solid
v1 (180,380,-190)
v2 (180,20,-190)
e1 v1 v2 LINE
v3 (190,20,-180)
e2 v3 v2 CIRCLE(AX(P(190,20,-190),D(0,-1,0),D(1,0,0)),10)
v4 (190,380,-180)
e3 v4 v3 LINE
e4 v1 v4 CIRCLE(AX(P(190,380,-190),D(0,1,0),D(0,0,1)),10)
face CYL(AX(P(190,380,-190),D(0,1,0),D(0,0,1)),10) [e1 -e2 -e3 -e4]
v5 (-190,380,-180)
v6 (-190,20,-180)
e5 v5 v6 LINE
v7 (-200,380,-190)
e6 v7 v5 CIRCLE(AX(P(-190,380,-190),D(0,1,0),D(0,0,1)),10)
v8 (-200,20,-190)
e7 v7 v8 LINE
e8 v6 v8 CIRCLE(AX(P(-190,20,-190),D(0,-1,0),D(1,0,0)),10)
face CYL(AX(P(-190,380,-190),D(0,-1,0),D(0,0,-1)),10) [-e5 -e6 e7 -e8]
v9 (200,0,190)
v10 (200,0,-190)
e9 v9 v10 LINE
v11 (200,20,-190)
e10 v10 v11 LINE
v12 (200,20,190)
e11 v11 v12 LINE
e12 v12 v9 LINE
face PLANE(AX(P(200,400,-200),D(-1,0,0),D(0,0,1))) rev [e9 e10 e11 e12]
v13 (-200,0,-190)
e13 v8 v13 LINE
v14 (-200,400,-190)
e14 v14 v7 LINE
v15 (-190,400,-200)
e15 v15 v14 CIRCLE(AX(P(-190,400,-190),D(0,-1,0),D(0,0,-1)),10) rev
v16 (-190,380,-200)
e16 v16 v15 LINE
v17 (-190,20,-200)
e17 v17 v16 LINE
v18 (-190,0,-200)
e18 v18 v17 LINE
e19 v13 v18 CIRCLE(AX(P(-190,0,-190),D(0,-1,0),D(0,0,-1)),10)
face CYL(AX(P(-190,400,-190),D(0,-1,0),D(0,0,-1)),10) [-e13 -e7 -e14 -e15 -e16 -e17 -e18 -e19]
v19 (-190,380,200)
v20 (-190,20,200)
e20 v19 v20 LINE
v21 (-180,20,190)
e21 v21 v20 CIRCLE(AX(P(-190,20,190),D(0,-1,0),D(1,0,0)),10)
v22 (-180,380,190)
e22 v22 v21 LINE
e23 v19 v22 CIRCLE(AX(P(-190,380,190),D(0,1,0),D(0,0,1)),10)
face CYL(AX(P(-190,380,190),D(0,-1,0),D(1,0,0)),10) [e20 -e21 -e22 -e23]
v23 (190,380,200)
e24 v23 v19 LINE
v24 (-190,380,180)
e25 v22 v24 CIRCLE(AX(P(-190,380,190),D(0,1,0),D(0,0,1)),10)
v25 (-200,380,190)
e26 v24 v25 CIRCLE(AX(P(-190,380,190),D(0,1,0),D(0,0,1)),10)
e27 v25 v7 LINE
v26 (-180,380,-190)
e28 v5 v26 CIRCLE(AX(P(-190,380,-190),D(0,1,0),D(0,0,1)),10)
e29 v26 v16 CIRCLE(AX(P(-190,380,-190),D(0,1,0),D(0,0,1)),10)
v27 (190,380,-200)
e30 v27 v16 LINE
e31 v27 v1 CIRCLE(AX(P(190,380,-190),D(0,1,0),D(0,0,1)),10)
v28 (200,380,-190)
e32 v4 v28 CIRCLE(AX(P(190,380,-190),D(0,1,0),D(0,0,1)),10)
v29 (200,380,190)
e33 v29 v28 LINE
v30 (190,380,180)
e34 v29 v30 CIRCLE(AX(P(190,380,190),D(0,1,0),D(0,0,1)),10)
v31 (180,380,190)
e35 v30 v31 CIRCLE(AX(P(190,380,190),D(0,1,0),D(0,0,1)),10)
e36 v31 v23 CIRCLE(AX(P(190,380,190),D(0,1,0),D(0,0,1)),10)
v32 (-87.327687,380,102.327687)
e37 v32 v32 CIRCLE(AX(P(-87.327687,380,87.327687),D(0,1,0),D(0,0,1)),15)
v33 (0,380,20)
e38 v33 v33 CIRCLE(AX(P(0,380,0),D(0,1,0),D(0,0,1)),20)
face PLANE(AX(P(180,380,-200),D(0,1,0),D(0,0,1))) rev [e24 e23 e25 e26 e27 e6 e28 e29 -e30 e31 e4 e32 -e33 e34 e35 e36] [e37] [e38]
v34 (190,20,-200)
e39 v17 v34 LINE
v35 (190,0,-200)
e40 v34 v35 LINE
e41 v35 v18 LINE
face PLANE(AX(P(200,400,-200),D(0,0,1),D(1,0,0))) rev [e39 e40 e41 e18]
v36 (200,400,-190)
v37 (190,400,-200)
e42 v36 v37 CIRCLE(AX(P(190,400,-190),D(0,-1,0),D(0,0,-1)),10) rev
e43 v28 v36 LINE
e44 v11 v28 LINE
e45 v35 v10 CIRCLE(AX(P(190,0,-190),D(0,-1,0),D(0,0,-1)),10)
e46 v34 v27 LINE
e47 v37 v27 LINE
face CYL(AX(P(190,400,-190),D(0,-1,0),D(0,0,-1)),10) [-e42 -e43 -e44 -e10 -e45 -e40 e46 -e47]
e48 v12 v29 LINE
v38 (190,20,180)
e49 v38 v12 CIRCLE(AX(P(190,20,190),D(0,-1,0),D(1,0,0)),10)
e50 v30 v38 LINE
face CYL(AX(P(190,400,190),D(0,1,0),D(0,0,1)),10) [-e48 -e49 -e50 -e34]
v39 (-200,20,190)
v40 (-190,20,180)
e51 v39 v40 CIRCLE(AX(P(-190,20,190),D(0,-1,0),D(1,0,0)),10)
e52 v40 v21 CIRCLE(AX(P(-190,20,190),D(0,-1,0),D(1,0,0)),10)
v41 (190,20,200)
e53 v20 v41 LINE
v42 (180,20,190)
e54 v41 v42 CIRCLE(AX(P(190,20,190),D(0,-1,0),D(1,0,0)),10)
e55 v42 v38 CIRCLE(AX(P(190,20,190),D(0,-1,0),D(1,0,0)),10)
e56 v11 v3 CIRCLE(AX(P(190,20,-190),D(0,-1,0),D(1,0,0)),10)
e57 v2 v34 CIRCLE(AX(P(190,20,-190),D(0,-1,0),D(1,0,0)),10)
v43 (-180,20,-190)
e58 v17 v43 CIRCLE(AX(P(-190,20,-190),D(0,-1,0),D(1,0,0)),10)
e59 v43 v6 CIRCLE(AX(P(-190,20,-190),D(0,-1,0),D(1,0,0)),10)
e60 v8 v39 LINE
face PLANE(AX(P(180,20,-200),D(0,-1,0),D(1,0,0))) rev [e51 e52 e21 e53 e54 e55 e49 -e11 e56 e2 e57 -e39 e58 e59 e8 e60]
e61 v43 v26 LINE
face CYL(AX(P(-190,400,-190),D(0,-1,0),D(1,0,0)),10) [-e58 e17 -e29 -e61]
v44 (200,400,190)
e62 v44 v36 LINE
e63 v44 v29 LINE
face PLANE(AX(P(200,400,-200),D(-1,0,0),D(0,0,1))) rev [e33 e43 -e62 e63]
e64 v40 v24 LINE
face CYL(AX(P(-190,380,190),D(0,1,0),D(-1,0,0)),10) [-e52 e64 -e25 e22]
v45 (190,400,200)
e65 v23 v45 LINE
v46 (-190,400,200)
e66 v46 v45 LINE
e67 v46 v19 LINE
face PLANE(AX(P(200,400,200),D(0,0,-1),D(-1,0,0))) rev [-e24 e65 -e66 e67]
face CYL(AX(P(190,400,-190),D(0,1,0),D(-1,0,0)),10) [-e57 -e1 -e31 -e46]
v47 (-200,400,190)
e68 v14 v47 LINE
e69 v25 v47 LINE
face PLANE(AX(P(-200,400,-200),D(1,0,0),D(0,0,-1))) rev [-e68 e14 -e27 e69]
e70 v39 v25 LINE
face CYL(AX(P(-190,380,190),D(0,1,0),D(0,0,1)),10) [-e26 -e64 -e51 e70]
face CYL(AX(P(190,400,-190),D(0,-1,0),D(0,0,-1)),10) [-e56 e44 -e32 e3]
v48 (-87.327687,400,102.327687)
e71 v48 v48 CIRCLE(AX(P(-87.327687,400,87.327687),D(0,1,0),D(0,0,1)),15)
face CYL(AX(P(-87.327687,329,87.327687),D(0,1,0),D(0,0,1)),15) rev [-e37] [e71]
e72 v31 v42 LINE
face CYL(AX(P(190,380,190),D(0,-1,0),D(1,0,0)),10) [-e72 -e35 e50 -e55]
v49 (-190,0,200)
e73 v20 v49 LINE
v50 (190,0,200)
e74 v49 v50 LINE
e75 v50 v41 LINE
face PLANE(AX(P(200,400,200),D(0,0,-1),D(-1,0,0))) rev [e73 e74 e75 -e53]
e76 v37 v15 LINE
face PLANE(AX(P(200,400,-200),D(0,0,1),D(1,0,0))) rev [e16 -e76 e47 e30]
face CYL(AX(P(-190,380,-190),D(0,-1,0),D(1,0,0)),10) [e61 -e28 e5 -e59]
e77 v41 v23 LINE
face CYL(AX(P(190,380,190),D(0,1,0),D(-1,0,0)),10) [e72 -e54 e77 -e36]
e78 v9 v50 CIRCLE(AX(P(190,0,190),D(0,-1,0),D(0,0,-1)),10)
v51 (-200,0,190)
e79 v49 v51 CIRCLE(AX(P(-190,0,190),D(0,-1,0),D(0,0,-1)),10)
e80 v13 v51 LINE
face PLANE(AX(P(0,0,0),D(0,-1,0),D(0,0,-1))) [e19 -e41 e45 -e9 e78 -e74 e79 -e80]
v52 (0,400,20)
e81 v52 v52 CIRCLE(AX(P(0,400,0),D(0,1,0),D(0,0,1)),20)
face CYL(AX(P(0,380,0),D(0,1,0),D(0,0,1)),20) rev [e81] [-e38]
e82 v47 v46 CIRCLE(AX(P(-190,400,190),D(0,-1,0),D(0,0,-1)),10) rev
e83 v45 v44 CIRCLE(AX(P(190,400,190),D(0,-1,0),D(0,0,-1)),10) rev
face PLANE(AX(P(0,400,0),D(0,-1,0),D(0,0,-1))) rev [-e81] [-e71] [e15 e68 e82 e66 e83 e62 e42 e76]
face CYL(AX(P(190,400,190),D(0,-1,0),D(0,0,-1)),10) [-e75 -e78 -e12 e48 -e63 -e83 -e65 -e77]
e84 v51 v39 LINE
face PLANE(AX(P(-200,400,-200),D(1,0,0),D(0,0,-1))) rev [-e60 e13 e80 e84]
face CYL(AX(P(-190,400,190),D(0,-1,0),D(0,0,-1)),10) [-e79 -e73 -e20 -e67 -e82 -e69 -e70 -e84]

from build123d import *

# Parameters (mm, degrees)
SKETCH2_W           = 400
SKETCH2_H           = 400
BOSS_EXTRUDE1_DEPTH = 400
SKETCH3_W           = 360
SKETCH3_H           = 360
CUT_EXTRUDE4_DEPTH  = 400
SKETCH5_W           = 360
SKETCH5_H           = 360
CUT_EXTRUDE5_DEPTH  = 400
FILLET1_R           = 10
FILLET2_START       = -1
FILLET2_DEPTH       = 402
FILLET3_R           = 10
FILLET4_R           = 10
FILLET6_R           = 10
FILLET7_R           = 10
FILLET8_R           = 10
SKETCH6_R           = 20
CUT_EXTRUDE6_DEPTH  = 20
SKETCH9_R           = 15
CUT_EXTRUDE8_DEPTH  = 71


with BuildPart() as part:
    # Sketch2 → Boss-Extrude1 (new body)
    with BuildSketch(Plane(origin=(0, 0, 0), x_dir=(1, 0, 0), z_dir=(0, 1, 0))):
        Rectangle(SKETCH2_W, SKETCH2_H)
    extrude(amount=BOSS_EXTRUDE1_DEPTH)

    # Sketch3 → Cut-Extrude4 (cut)
    with BuildSketch(Plane.XY.offset(200)):
        with Locations((0, 200)):
            Rectangle(SKETCH3_W, SKETCH3_H)
    extrude(amount=-CUT_EXTRUDE4_DEPTH, mode=Mode.SUBTRACT)

    # Sketch5 → Cut-Extrude5 (cut)
    with BuildSketch(Plane.ZY.offset(200)):
        with Locations((0, 200)):
            Rectangle(SKETCH5_W, SKETCH5_H)
    extrude(amount=-CUT_EXTRUDE5_DEPTH, mode=Mode.SUBTRACT)

    # Fillet1
    fillet1_edges = [part.edges().sort_by_distance(p)[0] for p in [
        (200, 200, 180),
    ]]
    fillet(fillet1_edges, radius=FILLET1_R)

    # Fillet2: read off the stored shape, not the designer's step
    # Fillet2 outline → Fillet2 (cut)
    with BuildSketch(Plane(origin=(0, 0, 0), x_dir=(1, 0, 0), z_dir=(0, 1, 0)).offset(FILLET2_START)):
        with BuildLine():
            Line((200, -200), (200, -190))
            ThreePointArc((200, -190), (197.071067812, -197.071067812), (190, -200))
            Line((190, -200), (200, -200))
        make_face()
    extrude(amount=FILLET2_DEPTH, mode=Mode.SUBTRACT)

    # Fillet3
    fillet3_edges = [part.edges().sort_by_distance(p)[0] for p in [
        (180, 200, 180),
    ]]
    fillet(fillet3_edges, radius=FILLET3_R - 0.0001)  # a hair under: the kernel refuses the full size

    # Fillet4
    fillet4_edges = [part.edges().sort_by_distance(p)[0] for p in [
        (180, 200, 200),
    ]]
    fillet(fillet4_edges, radius=FILLET4_R - 0.0001)  # a hair under: the kernel refuses the full size

    # Fillet6
    fillet6_edges = [part.edges().sort_by_distance(p)[0] for p in [
        (-180, 200, -180),
        (-180, 200, -200),
        (-200, 200, -200),
        (-200, 200, -180),
    ]]
    fillet(fillet6_edges, radius=FILLET6_R - 0.0001)  # a hair under: the kernel refuses the full size

    # Fillet7
    fillet7_edges = [part.edges().sort_by_distance(p)[0] for p in [
        (200, 200, -180),
        (180, 200, -180),
        (180, 200, -200),
        (200, 200, -200),
    ]]
    fillet(fillet7_edges, radius=FILLET7_R - 0.0001)  # a hair under: the kernel refuses the full size

    # Fillet8
    fillet8_edges = [part.edges().sort_by_distance(p)[0] for p in [
        (-180, 200, 180),
        (-200, 200, 180),
        (-180, 200, 200),
        (-200, 200, 200),
    ]]
    fillet(fillet8_edges, radius=FILLET8_R - 0.0001)  # a hair under: the kernel refuses the full size

    # Sketch6 → Cut-Extrude6 (cut)
    with BuildSketch(Plane(origin=(0, 400, 0), x_dir=(1, 0, 0), z_dir=(0, 1, 0))):
        with Locations(Location((0, 0, 0), (0, 0, 270))):
            Circle(SKETCH6_R)
    extrude(amount=-CUT_EXTRUDE6_DEPTH, mode=Mode.SUBTRACT)

    # Sketch9 → Cut-Extrude8 (cut)
    with BuildSketch(Plane(origin=(0, 400, 0), x_dir=(1, 0, 0), z_dir=(0, 1, 0))):
        with Locations(Location((-87.327687477, -87.327687477, 0), (0, 0, 270))):
            Circle(SKETCH9_R)
    extrude(amount=-CUT_EXTRUDE8_DEPTH, mode=Mode.SUBTRACT)


solid = part.part
